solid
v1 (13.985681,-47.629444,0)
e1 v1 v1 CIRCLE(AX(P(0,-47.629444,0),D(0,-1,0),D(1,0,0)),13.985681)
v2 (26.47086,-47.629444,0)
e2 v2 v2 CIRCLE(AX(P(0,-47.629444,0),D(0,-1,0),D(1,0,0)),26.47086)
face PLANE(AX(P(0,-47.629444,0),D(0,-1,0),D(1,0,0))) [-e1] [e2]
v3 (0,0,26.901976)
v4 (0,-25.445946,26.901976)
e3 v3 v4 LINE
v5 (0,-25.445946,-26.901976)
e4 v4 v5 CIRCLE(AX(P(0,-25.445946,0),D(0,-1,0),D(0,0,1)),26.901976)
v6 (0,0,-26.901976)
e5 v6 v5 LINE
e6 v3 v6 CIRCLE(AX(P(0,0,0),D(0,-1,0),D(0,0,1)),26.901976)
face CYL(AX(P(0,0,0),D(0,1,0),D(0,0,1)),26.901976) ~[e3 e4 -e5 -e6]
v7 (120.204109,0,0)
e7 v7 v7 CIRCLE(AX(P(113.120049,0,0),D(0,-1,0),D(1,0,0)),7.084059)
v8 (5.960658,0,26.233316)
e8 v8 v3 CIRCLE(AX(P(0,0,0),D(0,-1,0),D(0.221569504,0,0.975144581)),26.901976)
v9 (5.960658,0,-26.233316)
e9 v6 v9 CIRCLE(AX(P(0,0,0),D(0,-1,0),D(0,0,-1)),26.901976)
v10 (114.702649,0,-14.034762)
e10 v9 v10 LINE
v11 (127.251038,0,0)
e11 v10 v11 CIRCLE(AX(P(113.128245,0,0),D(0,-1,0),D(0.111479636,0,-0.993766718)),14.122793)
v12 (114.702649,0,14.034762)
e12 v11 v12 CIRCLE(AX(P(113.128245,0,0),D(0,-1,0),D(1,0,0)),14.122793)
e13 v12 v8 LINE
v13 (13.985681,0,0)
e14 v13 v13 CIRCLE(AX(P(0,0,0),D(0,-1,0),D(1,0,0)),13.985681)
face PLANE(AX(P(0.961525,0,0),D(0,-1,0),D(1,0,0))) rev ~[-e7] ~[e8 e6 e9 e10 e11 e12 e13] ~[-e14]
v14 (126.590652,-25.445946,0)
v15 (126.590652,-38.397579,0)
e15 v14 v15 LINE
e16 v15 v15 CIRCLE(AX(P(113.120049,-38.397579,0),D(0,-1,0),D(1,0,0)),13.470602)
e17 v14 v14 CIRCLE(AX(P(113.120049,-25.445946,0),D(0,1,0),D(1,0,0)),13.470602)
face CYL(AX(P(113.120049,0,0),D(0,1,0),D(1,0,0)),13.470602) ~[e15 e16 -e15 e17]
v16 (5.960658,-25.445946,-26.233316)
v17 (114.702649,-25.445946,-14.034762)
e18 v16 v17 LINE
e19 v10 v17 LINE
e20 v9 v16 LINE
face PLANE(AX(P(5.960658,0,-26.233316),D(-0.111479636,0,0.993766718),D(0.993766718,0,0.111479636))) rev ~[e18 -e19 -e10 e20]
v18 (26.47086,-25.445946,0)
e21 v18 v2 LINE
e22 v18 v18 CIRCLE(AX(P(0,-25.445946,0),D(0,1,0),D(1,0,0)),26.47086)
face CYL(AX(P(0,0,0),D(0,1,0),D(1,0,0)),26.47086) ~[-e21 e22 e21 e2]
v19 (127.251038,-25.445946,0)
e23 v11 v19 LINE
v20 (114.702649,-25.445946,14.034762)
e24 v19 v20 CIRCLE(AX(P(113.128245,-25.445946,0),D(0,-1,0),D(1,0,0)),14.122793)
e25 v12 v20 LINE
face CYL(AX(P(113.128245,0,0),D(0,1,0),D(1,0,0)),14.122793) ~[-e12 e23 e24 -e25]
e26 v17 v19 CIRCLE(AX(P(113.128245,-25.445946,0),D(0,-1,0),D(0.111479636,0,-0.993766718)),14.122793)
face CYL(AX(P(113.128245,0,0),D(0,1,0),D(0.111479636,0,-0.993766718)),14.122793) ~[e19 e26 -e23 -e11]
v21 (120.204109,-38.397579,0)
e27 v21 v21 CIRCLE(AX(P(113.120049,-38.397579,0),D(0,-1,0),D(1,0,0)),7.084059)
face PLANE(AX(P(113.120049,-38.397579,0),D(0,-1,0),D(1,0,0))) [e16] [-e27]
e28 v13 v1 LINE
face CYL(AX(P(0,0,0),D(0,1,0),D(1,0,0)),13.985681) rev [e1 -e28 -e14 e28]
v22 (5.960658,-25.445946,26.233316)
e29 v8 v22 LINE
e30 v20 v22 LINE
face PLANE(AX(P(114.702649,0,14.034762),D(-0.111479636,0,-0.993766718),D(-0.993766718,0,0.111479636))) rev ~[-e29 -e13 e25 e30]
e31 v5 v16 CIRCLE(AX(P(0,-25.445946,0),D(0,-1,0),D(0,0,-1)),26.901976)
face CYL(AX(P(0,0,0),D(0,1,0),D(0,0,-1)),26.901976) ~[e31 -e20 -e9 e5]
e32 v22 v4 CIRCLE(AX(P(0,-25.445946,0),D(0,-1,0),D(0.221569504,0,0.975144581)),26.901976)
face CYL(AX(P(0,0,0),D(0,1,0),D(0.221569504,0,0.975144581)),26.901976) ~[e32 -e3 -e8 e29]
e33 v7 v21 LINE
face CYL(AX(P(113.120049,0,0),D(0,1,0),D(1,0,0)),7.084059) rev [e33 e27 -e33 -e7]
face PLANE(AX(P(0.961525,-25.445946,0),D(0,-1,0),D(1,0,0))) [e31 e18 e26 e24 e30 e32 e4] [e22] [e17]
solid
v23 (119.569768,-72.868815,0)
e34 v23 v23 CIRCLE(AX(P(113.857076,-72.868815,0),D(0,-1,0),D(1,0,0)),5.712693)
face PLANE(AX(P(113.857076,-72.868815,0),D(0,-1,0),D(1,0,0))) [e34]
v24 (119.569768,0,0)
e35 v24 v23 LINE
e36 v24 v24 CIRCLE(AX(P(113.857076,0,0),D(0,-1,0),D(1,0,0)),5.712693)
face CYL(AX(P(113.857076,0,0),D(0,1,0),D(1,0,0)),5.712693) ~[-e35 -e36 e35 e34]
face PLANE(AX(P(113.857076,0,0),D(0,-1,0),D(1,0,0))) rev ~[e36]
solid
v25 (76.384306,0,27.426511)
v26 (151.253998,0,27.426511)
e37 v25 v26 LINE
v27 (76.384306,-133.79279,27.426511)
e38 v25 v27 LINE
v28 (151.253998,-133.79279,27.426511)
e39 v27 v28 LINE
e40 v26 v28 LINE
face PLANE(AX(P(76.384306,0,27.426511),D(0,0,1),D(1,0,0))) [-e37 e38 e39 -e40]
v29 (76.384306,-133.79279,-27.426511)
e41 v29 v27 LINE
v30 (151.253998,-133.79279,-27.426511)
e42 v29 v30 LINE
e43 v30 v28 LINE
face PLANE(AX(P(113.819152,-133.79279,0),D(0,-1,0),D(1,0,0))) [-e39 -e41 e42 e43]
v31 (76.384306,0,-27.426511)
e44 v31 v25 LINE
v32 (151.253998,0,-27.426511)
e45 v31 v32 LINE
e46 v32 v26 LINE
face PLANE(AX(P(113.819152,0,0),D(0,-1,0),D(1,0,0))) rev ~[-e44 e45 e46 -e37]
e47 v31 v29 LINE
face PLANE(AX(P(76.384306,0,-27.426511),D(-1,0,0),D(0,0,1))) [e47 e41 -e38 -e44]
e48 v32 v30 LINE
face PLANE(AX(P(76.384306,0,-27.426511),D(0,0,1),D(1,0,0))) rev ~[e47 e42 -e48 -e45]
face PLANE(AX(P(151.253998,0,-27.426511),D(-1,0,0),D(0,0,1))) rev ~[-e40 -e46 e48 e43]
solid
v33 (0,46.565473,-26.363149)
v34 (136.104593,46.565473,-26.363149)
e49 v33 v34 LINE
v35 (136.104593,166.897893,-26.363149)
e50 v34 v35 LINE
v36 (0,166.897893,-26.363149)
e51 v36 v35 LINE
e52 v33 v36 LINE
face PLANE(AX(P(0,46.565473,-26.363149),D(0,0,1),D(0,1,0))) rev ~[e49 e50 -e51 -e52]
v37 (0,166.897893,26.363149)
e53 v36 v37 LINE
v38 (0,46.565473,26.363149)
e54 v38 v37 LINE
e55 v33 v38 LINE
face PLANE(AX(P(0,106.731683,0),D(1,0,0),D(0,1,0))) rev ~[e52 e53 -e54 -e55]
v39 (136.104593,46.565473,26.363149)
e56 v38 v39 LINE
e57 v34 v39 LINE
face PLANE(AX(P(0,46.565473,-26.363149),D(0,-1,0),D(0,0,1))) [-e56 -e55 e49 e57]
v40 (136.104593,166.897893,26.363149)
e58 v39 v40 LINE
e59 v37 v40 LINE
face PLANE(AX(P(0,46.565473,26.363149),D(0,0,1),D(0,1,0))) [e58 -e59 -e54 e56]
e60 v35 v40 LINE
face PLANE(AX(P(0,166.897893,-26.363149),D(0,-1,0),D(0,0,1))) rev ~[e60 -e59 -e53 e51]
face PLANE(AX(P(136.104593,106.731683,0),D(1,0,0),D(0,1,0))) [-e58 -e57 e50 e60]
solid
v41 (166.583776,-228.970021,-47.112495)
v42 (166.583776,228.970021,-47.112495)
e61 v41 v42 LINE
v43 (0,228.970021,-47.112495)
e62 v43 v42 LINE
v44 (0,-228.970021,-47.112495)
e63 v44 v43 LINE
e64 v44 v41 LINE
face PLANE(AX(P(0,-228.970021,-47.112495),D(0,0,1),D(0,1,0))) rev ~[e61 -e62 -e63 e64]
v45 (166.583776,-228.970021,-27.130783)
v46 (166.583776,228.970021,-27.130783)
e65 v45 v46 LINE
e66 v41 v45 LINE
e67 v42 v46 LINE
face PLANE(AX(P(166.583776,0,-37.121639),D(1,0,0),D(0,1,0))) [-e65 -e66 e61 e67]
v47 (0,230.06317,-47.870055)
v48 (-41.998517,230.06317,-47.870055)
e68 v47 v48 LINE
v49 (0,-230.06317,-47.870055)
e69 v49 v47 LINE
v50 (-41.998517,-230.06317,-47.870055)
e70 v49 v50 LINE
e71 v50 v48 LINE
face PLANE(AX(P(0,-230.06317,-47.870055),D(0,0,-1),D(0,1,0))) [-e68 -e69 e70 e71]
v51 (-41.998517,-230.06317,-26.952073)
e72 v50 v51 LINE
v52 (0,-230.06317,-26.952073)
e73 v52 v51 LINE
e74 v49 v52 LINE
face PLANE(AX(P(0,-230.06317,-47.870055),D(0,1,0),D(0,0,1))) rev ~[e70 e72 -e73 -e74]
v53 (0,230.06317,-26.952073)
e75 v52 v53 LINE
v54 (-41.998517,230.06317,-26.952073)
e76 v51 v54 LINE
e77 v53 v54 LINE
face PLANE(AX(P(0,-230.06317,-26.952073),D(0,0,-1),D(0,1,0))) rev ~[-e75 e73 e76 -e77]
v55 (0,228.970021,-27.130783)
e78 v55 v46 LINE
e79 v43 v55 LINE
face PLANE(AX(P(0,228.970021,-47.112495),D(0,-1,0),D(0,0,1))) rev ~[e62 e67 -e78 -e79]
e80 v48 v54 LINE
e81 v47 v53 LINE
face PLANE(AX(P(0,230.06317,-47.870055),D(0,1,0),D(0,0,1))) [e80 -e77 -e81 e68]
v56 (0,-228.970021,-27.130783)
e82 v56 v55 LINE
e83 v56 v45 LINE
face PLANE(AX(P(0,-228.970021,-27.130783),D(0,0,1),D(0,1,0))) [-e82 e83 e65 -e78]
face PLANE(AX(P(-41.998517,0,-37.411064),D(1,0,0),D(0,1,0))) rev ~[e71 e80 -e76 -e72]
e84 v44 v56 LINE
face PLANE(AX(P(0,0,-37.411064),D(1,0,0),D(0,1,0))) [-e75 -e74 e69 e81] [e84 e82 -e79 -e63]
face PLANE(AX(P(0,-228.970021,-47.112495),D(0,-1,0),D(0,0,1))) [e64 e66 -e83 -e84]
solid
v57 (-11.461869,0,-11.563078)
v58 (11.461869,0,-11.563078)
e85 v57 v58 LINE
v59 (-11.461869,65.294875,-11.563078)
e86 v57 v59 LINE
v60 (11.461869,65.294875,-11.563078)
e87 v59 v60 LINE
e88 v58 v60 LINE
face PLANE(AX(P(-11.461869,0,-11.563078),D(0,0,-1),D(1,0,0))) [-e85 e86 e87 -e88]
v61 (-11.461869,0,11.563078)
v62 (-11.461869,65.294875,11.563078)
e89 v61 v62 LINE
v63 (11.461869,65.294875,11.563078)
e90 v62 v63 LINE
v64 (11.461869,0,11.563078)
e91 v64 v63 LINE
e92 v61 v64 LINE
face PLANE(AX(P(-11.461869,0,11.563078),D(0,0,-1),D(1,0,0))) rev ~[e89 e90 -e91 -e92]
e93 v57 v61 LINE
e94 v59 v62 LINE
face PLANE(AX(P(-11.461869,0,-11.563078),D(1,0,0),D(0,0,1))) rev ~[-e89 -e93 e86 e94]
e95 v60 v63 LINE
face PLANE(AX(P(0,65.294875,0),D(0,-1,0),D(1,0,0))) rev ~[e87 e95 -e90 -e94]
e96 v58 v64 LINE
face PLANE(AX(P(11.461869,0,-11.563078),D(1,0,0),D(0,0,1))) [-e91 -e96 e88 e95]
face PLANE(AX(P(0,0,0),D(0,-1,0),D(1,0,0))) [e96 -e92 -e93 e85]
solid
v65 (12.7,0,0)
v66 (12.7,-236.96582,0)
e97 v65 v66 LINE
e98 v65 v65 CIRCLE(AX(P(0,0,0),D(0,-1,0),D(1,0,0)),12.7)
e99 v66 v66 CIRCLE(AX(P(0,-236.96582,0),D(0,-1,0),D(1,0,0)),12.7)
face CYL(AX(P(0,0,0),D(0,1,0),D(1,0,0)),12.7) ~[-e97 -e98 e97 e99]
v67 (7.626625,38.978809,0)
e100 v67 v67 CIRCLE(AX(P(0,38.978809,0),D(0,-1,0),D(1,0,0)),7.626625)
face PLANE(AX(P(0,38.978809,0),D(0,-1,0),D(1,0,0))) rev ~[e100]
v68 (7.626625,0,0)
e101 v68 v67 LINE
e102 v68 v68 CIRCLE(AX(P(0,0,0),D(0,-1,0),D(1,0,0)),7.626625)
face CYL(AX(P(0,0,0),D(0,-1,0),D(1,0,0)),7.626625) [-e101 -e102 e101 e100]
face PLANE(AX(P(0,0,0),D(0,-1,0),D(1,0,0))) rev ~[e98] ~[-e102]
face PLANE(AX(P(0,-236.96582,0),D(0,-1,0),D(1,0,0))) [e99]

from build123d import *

# Parameters (mm, degrees)
F0_R      = 14.3293647742
F0_R_2    = 8.090753617
F1_DEPTH  = 25.4459455609
F2_R      = 26.470860224
F2_R_2    = 13.9856812783
F3_DEPTH  = 47.6294439286
F4_R      = 13.4706024235
F4_R_2    = 7.084059424
F5_DEPTH  = 38.3975785226
F6_R      = 12.7
F7_DEPTH  = 236.9658201933
F8_R      = 7.6266251534
F9_DEPTH  = 38.9788094908
F10_W     = 457.9400420189
F10_H     = 19.9817121029
F11_DEPTH = 166.583776474
F14_W     = 120.3324198723
F14_H     = 52.7262985706
F15_DEPTH = 136.1045930535
F16_W     = 460.1263403893
F16_H     = 20.917981863
F17_DEPTH = 41.9985167682
F18_W     = 22.9237377644
F18_H     = 23.126155138
F19_DEPTH = 65.294874832
F22_R     = 5.7126926056
F23_DEPTH = 72.8688146919
F24_W     = 74.8696923256
F24_H     = 54.8530220985
F25_DEPTH = 133.7927896529


# Not quite as in the source:
# - the program builds the solid bodies; features that only make, move or delete a surface that nothing else refers to are left out


with BuildPart() as f1:
    # F0 (on Front) → F1 (new body)
    with BuildSketch(Plane.XZ):
        with BuildLine():
            Line((5.9606575044, 26.2333161817), (0, 26.901976057))
            ThreePointArc((0, 26.901976057), (-26.901976057, 0), (0, -26.901976057))
            Line((0, -26.901976057), (5.9606575044, -26.2333161817))
            ThreePointArc((5.9606575044, -26.2333161817), (21.024625814, -16.7833675153), (26.901976057, 0))
            ThreePointArc((26.901976057, 0), (21.024625814, 16.7833675153), (5.9606575044, 26.2333161817))
        make_face()
        Circle(F0_R, mode=Mode.SUBTRACT)
        with BuildLine():
            ThreePointArc((5.9606575044, 26.2333161817), (2.9990225038, 26.7342884662), (0, 26.901976057))
            Line((0, 26.901976057), (5.9606575044, 26.2333161817))
        make_face()
        with BuildLine():
            Line((5.9606575044, -26.2333161817), (0, -26.901976057))
            ThreePointArc((0, -26.901976057), (2.9990225038, -26.7342884662), (5.9606575044, -26.2333161817))
        make_face()
        with BuildLine():
            Line((114.7026486896, 14.0347615394), (5.9606575044, 26.2333161817))
            ThreePointArc((5.9606575044, 26.2333161817), (21.024625814, 16.7833675153), (26.901976057, 0))
            ThreePointArc((26.901976057, 0), (21.024625814, -16.7833675153), (5.9606575044, -26.2333161817))
            Line((5.9606575044, -26.2333161817), (114.7026486896, -14.0347615394))
            ThreePointArc((114.7026486896, -14.0347615394), (99.0054519932, 0), (114.7026486896, 14.0347615394))
        make_face()
        with BuildLine():
            ThreePointArc((127.2510377605, 0), (123.6564987159, 9.4132433271), (114.7026486896, 14.0347615394))
            ThreePointArc((114.7026486896, 14.0347615394), (99.0054519932, 0), (114.7026486896, -14.0347615394))
            ThreePointArc((114.7026486896, -14.0347615394), (123.6564987159, -9.4132433271), (127.2510377605, 0))
        make_face()
        with Locations((113.1282448769, 0)):
            Circle(F0_R_2, mode=Mode.SUBTRACT)
    extrude(amount=F1_DEPTH)

    # F2 (on Front) → F3 (join)
    with BuildSketch(Plane.XZ):
        Circle(F2_R)
        Circle(F2_R_2, mode=Mode.SUBTRACT)
    extrude(amount=F3_DEPTH)

    # F4 (on Front) → F5 (join)
    with BuildSketch(Plane.XZ):
        with Locations((113.1200492382, 0)):
            Circle(F4_R)
        with Locations((113.1200492382, 0)):
            Circle(F4_R_2, mode=Mode.SUBTRACT)
    extrude(amount=F5_DEPTH)


with BuildPart() as f7:
    # F6 (on Front) → F7 (new body)
    with BuildSketch(Plane.XZ):
        Circle(F6_R)
    extrude(amount=F7_DEPTH)

    # F8 (on Front) → F9 (join)
    with BuildSketch(Plane.XZ):
        Circle(F8_R)
    extrude(amount=-F9_DEPTH)


with BuildPart() as f11:
    # F10 (on Right) → F11 (new body)
    with BuildSketch(Plane.YZ):
        with Locations((0, -37.1216386557)):
            Rectangle(F10_W, F10_H)
    extrude(amount=F11_DEPTH)

    # F16 (on Right) → F17 (join)
    with BuildSketch(Plane.YZ):
        with Locations((0, -37.4110639095)):
            Rectangle(F16_W, F16_H)
    extrude(amount=-F17_DEPTH)


with BuildPart() as f15:
    # F14 (on Right) → F15 (new body)
    with BuildSketch(Plane.YZ):
        with Locations((106.7316830158, 0)):
            Rectangle(F14_W, F14_H)
    extrude(amount=F15_DEPTH)


with BuildPart() as f19:
    # F18 (on Front) → F19 (new body)
    with BuildSketch(Plane.XZ):
        Rectangle(F18_W, F18_H)
    extrude(amount=-F19_DEPTH)


with BuildPart() as f23:
    # F22 (on Front) → F23 (new body)
    with BuildSketch(Plane.XZ):
        with Locations((113.857075572, 0)):
            Circle(F22_R)
    extrude(amount=F23_DEPTH)


with BuildPart() as f25:
    # F24 (on Front) → F25 (new body)
    with BuildSketch(Plane.XZ):
        with Locations((113.8191521168, 0)):
            Rectangle(F24_W, F24_H)
    extrude(amount=F25_DEPTH)


solid = Compound([f1.part, f7.part, f11.part, f15.part, f19.part, f23.part, f25.part])
